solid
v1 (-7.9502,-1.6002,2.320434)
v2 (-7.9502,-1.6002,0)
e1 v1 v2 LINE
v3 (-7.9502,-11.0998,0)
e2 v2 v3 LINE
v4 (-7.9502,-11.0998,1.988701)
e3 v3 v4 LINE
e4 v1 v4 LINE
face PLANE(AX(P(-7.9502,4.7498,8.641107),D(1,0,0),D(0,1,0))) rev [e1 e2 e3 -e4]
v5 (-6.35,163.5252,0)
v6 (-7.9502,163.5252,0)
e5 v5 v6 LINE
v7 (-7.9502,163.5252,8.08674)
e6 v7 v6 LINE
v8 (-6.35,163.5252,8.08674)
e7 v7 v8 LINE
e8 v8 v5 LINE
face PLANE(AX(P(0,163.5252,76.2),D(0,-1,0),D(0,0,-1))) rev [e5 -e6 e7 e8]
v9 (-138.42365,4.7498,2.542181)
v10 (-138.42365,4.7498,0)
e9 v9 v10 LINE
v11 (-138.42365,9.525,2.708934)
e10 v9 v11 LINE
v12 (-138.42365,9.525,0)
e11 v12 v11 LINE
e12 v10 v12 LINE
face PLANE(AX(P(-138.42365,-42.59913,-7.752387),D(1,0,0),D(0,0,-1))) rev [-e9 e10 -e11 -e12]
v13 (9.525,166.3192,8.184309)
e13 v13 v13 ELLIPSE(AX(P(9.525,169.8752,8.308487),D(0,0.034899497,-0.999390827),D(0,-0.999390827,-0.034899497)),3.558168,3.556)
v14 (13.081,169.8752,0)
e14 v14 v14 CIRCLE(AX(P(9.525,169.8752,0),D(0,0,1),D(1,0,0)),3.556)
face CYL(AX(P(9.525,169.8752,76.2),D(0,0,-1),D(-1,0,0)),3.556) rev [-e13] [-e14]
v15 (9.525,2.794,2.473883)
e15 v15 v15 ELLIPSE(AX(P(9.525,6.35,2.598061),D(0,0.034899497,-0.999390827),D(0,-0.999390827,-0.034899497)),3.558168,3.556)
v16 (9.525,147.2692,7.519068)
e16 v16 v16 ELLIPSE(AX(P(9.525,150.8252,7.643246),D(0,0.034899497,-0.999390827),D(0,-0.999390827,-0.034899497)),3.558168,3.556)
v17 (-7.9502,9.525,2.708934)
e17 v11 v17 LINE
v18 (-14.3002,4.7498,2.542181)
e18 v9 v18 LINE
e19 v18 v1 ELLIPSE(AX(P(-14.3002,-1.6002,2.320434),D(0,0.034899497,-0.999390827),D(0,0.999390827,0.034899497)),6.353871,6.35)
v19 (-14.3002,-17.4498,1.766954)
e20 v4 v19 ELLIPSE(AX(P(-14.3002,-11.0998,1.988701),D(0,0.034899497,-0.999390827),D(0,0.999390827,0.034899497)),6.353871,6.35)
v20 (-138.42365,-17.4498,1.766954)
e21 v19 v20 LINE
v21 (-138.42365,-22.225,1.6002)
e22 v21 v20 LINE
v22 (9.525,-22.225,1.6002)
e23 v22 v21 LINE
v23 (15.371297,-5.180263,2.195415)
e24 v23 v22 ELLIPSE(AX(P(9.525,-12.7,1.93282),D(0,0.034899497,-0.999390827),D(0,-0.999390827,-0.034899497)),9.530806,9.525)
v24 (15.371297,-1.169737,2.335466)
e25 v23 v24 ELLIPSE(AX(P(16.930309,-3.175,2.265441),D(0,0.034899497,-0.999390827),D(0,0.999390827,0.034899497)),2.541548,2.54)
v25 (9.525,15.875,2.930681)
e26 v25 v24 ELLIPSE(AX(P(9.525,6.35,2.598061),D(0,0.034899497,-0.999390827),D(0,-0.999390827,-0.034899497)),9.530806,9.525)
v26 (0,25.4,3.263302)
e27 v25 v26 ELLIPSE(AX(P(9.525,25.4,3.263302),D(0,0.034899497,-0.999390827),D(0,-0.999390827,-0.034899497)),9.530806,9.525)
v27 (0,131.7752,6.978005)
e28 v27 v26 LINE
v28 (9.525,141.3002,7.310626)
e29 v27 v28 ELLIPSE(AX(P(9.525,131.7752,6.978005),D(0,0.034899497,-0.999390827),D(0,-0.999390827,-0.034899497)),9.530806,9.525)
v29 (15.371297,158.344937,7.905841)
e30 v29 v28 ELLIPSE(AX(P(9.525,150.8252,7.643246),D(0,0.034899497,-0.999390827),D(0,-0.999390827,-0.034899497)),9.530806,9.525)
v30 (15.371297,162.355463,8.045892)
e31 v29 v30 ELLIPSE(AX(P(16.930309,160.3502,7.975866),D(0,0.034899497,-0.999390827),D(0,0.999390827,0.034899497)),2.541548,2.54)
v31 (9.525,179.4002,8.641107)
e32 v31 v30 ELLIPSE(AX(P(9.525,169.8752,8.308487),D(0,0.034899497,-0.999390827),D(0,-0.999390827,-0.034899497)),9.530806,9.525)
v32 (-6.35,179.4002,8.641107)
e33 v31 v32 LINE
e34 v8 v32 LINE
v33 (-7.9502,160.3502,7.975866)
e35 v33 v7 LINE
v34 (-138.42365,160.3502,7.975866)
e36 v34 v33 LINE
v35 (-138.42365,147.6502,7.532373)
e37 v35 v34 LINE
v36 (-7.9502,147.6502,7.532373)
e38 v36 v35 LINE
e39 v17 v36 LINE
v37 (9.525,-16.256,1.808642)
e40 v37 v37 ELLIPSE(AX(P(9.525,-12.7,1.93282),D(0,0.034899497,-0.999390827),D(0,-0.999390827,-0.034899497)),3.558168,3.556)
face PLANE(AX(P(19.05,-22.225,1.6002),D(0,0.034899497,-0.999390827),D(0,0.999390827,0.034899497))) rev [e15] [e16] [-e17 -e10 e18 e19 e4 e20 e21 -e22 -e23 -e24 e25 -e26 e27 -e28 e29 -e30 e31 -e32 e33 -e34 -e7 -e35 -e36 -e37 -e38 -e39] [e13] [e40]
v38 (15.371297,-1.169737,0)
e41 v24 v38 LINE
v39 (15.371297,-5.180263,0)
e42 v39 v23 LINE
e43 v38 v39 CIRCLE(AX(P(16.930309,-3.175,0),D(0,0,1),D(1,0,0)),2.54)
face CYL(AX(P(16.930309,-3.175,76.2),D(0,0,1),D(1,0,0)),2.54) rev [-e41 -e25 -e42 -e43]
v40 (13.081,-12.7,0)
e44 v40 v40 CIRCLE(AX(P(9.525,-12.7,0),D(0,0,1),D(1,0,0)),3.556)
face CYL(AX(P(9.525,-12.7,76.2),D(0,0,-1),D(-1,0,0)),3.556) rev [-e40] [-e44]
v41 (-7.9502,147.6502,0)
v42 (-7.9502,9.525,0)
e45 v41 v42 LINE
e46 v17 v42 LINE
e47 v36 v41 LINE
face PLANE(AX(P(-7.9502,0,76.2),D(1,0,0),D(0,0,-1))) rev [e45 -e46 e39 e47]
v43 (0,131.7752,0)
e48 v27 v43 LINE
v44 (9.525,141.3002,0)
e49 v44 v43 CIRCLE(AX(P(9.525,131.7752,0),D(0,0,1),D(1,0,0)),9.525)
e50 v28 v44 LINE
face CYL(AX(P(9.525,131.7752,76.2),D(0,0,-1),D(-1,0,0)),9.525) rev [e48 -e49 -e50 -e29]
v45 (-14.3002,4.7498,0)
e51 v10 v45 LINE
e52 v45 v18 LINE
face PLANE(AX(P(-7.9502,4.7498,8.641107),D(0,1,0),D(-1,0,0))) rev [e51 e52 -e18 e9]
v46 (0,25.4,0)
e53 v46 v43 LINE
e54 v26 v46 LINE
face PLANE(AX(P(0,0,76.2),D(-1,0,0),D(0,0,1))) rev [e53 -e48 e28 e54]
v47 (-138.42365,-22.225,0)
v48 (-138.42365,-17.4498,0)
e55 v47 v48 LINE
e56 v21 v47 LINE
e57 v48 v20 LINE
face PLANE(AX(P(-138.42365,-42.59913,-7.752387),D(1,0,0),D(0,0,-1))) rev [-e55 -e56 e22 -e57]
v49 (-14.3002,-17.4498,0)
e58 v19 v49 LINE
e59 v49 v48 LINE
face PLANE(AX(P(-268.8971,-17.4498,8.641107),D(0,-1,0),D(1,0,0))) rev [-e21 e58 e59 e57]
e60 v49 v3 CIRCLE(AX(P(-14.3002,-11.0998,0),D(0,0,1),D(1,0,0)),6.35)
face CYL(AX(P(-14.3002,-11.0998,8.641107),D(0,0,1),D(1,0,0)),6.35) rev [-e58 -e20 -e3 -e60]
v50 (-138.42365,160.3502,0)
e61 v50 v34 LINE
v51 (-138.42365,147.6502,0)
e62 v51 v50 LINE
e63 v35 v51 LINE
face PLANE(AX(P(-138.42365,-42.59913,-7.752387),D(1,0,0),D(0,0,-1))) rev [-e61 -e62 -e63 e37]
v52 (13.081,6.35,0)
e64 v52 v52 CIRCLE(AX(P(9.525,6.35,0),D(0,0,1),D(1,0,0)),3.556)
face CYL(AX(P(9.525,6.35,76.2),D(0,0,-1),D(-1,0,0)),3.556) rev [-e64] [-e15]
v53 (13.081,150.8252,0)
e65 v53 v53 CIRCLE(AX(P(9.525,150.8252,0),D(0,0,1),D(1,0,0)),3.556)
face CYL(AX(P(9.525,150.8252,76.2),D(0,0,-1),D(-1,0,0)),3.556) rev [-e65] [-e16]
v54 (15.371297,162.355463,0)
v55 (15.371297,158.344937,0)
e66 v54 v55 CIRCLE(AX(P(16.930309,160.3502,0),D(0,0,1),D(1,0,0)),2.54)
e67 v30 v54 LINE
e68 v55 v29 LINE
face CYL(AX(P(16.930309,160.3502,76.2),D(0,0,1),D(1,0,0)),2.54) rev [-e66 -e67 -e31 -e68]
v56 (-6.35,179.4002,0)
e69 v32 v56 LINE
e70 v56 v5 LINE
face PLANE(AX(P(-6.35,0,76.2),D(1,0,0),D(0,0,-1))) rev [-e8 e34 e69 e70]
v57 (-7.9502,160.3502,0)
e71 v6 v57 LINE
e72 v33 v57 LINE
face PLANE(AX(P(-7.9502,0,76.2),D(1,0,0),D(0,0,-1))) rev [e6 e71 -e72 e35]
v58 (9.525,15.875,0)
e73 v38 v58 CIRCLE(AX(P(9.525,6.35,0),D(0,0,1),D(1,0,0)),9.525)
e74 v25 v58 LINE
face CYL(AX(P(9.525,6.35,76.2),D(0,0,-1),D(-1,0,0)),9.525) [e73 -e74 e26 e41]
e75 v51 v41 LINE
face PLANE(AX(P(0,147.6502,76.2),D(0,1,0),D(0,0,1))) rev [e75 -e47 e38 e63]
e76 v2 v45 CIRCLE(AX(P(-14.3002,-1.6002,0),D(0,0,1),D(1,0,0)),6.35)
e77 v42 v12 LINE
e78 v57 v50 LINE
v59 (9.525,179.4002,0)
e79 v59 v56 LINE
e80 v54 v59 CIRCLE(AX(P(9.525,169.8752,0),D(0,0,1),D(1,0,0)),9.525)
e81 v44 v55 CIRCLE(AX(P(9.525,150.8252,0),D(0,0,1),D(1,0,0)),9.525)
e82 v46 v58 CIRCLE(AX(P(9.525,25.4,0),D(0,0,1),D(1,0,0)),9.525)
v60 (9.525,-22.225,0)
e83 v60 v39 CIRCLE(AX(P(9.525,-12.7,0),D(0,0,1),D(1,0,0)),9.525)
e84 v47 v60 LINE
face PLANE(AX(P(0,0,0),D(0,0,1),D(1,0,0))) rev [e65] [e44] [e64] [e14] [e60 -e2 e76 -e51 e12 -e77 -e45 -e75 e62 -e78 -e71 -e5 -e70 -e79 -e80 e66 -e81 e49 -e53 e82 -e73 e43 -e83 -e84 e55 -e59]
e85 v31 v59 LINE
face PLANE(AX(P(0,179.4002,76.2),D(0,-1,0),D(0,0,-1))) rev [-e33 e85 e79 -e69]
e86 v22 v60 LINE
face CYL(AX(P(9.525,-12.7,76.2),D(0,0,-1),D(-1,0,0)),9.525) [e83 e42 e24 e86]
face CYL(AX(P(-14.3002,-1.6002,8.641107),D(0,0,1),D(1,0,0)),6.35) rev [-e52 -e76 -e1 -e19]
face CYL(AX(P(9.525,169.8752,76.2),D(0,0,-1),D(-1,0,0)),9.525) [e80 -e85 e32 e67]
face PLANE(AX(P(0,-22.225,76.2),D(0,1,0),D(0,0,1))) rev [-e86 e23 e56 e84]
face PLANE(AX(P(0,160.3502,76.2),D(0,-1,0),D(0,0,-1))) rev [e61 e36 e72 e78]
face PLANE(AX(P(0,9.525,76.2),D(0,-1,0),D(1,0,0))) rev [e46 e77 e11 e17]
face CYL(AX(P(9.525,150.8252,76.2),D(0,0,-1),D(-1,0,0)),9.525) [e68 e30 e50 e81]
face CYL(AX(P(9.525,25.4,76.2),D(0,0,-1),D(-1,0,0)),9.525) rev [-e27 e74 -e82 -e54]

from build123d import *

# Parameters (mm, degrees)
BOSS_EXTRUDE1_OUTLINE_R = 3.556
BOSS_EXTRUDE1_OUTLINE_W = 260.9469
BOSS_EXTRUDE1_OUTLINE_H = 138.1252
BOSS_EXTRUDE1_DEPTH     = 76.2
CUT_EXTRUDE1_DEPTH      = 355.32482824
CUT_EXTRUDE1_DEPTH_BACK = 355.32482824
FILLET1_R               = 2.54
SKETCH7_W               = 260.9469
SKETCH7_H               = 22.1996
CUT_EXTRUDE2_DEPTH      = 347.152897849
FILLET2_R               = 6.35
SKETCH8_W               = 208.809057266
SKETCH8_H               = 235.521960295
CUT_EXTRUDE4_DEPTH      = 347.144751077


# Read off the part's stored shape, not the designer's step: Boss-Extrude1
with BuildPart() as part:
    # Boss-Extrude1 outline → Boss-Extrude1 (new body)
    with BuildSketch(Plane.XY):
        with BuildLine():
            Line((-286.3596, -22.225), (9.525, -22.225))
            ThreePointArc((9.525, -22.225), (19.05, -12.7), (9.525, -3.175))
            ThreePointArc((9.525, -3.175), (19.05, 6.35), (9.525, 15.875))
            ThreePointArc((9.525, 15.875), (2.789807909, 18.664807909), (0, 25.4))
            Line((0, 25.4), (0, 131.7752))
            ThreePointArc((0, 131.7752), (2.789807909, 138.510392091), (9.525, 141.3002))
            ThreePointArc((9.525, 141.3002), (19.05, 150.8252), (9.525, 160.3502))
            ThreePointArc((9.525, 160.3502), (19.05, 169.8752), (9.525, 179.4002))
            Line((9.525, 179.4002), (-6.35, 179.4002))
            Line((-6.35, 179.4002), (-6.35, 163.5252))
            Line((-6.35, 163.5252), (-7.9502, 163.5252))
            Line((-7.9502, 163.5252), (-7.9502, 160.3502))
            Line((-7.9502, 160.3502), (-268.9098, 160.3502))
            Line((-268.9098, 160.3502), (-268.9098, 163.5252))
            Line((-268.9098, 163.5252), (-270.51, 163.5252))
            Line((-270.51, 163.5252), (-270.51, 179.4002))
            Line((-270.51, 179.4002), (-286.385, 179.4002))
            ThreePointArc((-286.385, 179.4002), (-295.91, 169.8752), (-286.385, 160.3502))
            ThreePointArc((-286.385, 160.3502), (-295.897297883, 150.818850004), (-286.3723, 141.3002))
            ThreePointArc((-286.3723, 141.3002), (-279.637107909, 138.510392091), (-276.8473, 131.7752))
            Line((-276.8473, 131.7752), (-276.8473, 25.4))
            ThreePointArc((-276.8473, 25.4), (-279.637107909, 18.664807909), (-286.3723, 15.875))
            ThreePointArc((-286.3723, 15.875), (-295.8973, 6.35), (-286.3723, -3.175))
            ThreePointArc((-286.3723, -3.175), (-295.884597883, -12.706349996), (-286.3596, -22.225))
        make_face()
        with Locations((-286.3596, -12.7)):
            Circle(BOSS_EXTRUDE1_OUTLINE_R, mode=Mode.SUBTRACT)
        with Locations((-286.3723, 6.35)):
            Circle(BOSS_EXTRUDE1_OUTLINE_R, mode=Mode.SUBTRACT)
        with Locations((9.525, -12.7)):
            Circle(BOSS_EXTRUDE1_OUTLINE_R, mode=Mode.SUBTRACT)
        with Locations((9.525, 6.35)):
            Circle(BOSS_EXTRUDE1_OUTLINE_R, mode=Mode.SUBTRACT)
        with Locations((-286.3723, 150.8252)):
            Circle(BOSS_EXTRUDE1_OUTLINE_R, mode=Mode.SUBTRACT)
        with Locations((-286.385, 169.8752)):
            Circle(BOSS_EXTRUDE1_OUTLINE_R, mode=Mode.SUBTRACT)
        with Locations((-138.42365, 78.5876)):
            Rectangle(BOSS_EXTRUDE1_OUTLINE_W, BOSS_EXTRUDE1_OUTLINE_H, mode=Mode.SUBTRACT)
        with Locations((9.525, 150.8252)):
            Circle(BOSS_EXTRUDE1_OUTLINE_R, mode=Mode.SUBTRACT)
        with Locations((9.525, 169.8752)):
            Circle(BOSS_EXTRUDE1_OUTLINE_R, mode=Mode.SUBTRACT)
    extrude(amount=BOSS_EXTRUDE1_DEPTH)

    # Sketch5 → Cut-Extrude1 (cut, two sides: drawn at the far end of the back side and taken through both)
    with BuildSketch(Plane.ZY.offset(276.8473).offset(-CUT_EXTRUDE1_DEPTH_BACK)):
        Polygon((1.6002, -22.225), (8.641107133, 179.4002), (76.2, 179.4002), (76.2, -22.225), align=None)
    extrude(amount=CUT_EXTRUDE1_DEPTH + CUT_EXTRUDE1_DEPTH_BACK, mode=Mode.SUBTRACT)

    # Fillet1
    fillet1_edges = [part.edges().sort_by_distance(p)[0] for p in [
        (-286.385, 160.3502, 3.987933237),
        (-286.3723, -3.175, 1.132720329),
        (9.525, -3.175, 1.132720329),
        (9.525, 160.3502, 3.987933237),
    ]]
    fillet(fillet1_edges, radius=FILLET1_R)

    # Sketch7 → Cut-Extrude2 (cut, through all)
    with BuildSketch(Plane(origin=(0, 0, 0), x_dir=(-1, 0, 0), z_dir=(0, 0, -1))):
        with Locations((138.42365, -6.35)):
            Rectangle(SKETCH7_W, SKETCH7_H)
    extrude(amount=-CUT_EXTRUDE2_DEPTH, mode=Mode.SUBTRACT)

    # Fillet2
    fillet2_edges = [part.edges().sort_by_distance(p)[0] for p in [
        (-268.8971, 4.7498, 1.271090386),
        (-268.8971, -17.4498, 0.883476829),
        (-7.9502, -17.4498, 0.883476829),
        (-7.9502, 4.7498, 1.271090386),
    ]]
    fillet(fillet2_edges, radius=FILLET2_R)

    # Sketch8 → Cut-Extrude4 (cut, through all)
    with BuildSketch(Plane(origin=(0, -0.082881646, 2.373419811), x_dir=(1, 0, 0), z_dir=(0, -0.03489949670250444, 0.9993908270190958))):
        with Locations((-242.828178633, 74.917246318)):
            Rectangle(SKETCH8_W, SKETCH8_H)
    extrude(amount=-CUT_EXTRUDE4_DEPTH, mode=Mode.SUBTRACT)


solid = part.part
